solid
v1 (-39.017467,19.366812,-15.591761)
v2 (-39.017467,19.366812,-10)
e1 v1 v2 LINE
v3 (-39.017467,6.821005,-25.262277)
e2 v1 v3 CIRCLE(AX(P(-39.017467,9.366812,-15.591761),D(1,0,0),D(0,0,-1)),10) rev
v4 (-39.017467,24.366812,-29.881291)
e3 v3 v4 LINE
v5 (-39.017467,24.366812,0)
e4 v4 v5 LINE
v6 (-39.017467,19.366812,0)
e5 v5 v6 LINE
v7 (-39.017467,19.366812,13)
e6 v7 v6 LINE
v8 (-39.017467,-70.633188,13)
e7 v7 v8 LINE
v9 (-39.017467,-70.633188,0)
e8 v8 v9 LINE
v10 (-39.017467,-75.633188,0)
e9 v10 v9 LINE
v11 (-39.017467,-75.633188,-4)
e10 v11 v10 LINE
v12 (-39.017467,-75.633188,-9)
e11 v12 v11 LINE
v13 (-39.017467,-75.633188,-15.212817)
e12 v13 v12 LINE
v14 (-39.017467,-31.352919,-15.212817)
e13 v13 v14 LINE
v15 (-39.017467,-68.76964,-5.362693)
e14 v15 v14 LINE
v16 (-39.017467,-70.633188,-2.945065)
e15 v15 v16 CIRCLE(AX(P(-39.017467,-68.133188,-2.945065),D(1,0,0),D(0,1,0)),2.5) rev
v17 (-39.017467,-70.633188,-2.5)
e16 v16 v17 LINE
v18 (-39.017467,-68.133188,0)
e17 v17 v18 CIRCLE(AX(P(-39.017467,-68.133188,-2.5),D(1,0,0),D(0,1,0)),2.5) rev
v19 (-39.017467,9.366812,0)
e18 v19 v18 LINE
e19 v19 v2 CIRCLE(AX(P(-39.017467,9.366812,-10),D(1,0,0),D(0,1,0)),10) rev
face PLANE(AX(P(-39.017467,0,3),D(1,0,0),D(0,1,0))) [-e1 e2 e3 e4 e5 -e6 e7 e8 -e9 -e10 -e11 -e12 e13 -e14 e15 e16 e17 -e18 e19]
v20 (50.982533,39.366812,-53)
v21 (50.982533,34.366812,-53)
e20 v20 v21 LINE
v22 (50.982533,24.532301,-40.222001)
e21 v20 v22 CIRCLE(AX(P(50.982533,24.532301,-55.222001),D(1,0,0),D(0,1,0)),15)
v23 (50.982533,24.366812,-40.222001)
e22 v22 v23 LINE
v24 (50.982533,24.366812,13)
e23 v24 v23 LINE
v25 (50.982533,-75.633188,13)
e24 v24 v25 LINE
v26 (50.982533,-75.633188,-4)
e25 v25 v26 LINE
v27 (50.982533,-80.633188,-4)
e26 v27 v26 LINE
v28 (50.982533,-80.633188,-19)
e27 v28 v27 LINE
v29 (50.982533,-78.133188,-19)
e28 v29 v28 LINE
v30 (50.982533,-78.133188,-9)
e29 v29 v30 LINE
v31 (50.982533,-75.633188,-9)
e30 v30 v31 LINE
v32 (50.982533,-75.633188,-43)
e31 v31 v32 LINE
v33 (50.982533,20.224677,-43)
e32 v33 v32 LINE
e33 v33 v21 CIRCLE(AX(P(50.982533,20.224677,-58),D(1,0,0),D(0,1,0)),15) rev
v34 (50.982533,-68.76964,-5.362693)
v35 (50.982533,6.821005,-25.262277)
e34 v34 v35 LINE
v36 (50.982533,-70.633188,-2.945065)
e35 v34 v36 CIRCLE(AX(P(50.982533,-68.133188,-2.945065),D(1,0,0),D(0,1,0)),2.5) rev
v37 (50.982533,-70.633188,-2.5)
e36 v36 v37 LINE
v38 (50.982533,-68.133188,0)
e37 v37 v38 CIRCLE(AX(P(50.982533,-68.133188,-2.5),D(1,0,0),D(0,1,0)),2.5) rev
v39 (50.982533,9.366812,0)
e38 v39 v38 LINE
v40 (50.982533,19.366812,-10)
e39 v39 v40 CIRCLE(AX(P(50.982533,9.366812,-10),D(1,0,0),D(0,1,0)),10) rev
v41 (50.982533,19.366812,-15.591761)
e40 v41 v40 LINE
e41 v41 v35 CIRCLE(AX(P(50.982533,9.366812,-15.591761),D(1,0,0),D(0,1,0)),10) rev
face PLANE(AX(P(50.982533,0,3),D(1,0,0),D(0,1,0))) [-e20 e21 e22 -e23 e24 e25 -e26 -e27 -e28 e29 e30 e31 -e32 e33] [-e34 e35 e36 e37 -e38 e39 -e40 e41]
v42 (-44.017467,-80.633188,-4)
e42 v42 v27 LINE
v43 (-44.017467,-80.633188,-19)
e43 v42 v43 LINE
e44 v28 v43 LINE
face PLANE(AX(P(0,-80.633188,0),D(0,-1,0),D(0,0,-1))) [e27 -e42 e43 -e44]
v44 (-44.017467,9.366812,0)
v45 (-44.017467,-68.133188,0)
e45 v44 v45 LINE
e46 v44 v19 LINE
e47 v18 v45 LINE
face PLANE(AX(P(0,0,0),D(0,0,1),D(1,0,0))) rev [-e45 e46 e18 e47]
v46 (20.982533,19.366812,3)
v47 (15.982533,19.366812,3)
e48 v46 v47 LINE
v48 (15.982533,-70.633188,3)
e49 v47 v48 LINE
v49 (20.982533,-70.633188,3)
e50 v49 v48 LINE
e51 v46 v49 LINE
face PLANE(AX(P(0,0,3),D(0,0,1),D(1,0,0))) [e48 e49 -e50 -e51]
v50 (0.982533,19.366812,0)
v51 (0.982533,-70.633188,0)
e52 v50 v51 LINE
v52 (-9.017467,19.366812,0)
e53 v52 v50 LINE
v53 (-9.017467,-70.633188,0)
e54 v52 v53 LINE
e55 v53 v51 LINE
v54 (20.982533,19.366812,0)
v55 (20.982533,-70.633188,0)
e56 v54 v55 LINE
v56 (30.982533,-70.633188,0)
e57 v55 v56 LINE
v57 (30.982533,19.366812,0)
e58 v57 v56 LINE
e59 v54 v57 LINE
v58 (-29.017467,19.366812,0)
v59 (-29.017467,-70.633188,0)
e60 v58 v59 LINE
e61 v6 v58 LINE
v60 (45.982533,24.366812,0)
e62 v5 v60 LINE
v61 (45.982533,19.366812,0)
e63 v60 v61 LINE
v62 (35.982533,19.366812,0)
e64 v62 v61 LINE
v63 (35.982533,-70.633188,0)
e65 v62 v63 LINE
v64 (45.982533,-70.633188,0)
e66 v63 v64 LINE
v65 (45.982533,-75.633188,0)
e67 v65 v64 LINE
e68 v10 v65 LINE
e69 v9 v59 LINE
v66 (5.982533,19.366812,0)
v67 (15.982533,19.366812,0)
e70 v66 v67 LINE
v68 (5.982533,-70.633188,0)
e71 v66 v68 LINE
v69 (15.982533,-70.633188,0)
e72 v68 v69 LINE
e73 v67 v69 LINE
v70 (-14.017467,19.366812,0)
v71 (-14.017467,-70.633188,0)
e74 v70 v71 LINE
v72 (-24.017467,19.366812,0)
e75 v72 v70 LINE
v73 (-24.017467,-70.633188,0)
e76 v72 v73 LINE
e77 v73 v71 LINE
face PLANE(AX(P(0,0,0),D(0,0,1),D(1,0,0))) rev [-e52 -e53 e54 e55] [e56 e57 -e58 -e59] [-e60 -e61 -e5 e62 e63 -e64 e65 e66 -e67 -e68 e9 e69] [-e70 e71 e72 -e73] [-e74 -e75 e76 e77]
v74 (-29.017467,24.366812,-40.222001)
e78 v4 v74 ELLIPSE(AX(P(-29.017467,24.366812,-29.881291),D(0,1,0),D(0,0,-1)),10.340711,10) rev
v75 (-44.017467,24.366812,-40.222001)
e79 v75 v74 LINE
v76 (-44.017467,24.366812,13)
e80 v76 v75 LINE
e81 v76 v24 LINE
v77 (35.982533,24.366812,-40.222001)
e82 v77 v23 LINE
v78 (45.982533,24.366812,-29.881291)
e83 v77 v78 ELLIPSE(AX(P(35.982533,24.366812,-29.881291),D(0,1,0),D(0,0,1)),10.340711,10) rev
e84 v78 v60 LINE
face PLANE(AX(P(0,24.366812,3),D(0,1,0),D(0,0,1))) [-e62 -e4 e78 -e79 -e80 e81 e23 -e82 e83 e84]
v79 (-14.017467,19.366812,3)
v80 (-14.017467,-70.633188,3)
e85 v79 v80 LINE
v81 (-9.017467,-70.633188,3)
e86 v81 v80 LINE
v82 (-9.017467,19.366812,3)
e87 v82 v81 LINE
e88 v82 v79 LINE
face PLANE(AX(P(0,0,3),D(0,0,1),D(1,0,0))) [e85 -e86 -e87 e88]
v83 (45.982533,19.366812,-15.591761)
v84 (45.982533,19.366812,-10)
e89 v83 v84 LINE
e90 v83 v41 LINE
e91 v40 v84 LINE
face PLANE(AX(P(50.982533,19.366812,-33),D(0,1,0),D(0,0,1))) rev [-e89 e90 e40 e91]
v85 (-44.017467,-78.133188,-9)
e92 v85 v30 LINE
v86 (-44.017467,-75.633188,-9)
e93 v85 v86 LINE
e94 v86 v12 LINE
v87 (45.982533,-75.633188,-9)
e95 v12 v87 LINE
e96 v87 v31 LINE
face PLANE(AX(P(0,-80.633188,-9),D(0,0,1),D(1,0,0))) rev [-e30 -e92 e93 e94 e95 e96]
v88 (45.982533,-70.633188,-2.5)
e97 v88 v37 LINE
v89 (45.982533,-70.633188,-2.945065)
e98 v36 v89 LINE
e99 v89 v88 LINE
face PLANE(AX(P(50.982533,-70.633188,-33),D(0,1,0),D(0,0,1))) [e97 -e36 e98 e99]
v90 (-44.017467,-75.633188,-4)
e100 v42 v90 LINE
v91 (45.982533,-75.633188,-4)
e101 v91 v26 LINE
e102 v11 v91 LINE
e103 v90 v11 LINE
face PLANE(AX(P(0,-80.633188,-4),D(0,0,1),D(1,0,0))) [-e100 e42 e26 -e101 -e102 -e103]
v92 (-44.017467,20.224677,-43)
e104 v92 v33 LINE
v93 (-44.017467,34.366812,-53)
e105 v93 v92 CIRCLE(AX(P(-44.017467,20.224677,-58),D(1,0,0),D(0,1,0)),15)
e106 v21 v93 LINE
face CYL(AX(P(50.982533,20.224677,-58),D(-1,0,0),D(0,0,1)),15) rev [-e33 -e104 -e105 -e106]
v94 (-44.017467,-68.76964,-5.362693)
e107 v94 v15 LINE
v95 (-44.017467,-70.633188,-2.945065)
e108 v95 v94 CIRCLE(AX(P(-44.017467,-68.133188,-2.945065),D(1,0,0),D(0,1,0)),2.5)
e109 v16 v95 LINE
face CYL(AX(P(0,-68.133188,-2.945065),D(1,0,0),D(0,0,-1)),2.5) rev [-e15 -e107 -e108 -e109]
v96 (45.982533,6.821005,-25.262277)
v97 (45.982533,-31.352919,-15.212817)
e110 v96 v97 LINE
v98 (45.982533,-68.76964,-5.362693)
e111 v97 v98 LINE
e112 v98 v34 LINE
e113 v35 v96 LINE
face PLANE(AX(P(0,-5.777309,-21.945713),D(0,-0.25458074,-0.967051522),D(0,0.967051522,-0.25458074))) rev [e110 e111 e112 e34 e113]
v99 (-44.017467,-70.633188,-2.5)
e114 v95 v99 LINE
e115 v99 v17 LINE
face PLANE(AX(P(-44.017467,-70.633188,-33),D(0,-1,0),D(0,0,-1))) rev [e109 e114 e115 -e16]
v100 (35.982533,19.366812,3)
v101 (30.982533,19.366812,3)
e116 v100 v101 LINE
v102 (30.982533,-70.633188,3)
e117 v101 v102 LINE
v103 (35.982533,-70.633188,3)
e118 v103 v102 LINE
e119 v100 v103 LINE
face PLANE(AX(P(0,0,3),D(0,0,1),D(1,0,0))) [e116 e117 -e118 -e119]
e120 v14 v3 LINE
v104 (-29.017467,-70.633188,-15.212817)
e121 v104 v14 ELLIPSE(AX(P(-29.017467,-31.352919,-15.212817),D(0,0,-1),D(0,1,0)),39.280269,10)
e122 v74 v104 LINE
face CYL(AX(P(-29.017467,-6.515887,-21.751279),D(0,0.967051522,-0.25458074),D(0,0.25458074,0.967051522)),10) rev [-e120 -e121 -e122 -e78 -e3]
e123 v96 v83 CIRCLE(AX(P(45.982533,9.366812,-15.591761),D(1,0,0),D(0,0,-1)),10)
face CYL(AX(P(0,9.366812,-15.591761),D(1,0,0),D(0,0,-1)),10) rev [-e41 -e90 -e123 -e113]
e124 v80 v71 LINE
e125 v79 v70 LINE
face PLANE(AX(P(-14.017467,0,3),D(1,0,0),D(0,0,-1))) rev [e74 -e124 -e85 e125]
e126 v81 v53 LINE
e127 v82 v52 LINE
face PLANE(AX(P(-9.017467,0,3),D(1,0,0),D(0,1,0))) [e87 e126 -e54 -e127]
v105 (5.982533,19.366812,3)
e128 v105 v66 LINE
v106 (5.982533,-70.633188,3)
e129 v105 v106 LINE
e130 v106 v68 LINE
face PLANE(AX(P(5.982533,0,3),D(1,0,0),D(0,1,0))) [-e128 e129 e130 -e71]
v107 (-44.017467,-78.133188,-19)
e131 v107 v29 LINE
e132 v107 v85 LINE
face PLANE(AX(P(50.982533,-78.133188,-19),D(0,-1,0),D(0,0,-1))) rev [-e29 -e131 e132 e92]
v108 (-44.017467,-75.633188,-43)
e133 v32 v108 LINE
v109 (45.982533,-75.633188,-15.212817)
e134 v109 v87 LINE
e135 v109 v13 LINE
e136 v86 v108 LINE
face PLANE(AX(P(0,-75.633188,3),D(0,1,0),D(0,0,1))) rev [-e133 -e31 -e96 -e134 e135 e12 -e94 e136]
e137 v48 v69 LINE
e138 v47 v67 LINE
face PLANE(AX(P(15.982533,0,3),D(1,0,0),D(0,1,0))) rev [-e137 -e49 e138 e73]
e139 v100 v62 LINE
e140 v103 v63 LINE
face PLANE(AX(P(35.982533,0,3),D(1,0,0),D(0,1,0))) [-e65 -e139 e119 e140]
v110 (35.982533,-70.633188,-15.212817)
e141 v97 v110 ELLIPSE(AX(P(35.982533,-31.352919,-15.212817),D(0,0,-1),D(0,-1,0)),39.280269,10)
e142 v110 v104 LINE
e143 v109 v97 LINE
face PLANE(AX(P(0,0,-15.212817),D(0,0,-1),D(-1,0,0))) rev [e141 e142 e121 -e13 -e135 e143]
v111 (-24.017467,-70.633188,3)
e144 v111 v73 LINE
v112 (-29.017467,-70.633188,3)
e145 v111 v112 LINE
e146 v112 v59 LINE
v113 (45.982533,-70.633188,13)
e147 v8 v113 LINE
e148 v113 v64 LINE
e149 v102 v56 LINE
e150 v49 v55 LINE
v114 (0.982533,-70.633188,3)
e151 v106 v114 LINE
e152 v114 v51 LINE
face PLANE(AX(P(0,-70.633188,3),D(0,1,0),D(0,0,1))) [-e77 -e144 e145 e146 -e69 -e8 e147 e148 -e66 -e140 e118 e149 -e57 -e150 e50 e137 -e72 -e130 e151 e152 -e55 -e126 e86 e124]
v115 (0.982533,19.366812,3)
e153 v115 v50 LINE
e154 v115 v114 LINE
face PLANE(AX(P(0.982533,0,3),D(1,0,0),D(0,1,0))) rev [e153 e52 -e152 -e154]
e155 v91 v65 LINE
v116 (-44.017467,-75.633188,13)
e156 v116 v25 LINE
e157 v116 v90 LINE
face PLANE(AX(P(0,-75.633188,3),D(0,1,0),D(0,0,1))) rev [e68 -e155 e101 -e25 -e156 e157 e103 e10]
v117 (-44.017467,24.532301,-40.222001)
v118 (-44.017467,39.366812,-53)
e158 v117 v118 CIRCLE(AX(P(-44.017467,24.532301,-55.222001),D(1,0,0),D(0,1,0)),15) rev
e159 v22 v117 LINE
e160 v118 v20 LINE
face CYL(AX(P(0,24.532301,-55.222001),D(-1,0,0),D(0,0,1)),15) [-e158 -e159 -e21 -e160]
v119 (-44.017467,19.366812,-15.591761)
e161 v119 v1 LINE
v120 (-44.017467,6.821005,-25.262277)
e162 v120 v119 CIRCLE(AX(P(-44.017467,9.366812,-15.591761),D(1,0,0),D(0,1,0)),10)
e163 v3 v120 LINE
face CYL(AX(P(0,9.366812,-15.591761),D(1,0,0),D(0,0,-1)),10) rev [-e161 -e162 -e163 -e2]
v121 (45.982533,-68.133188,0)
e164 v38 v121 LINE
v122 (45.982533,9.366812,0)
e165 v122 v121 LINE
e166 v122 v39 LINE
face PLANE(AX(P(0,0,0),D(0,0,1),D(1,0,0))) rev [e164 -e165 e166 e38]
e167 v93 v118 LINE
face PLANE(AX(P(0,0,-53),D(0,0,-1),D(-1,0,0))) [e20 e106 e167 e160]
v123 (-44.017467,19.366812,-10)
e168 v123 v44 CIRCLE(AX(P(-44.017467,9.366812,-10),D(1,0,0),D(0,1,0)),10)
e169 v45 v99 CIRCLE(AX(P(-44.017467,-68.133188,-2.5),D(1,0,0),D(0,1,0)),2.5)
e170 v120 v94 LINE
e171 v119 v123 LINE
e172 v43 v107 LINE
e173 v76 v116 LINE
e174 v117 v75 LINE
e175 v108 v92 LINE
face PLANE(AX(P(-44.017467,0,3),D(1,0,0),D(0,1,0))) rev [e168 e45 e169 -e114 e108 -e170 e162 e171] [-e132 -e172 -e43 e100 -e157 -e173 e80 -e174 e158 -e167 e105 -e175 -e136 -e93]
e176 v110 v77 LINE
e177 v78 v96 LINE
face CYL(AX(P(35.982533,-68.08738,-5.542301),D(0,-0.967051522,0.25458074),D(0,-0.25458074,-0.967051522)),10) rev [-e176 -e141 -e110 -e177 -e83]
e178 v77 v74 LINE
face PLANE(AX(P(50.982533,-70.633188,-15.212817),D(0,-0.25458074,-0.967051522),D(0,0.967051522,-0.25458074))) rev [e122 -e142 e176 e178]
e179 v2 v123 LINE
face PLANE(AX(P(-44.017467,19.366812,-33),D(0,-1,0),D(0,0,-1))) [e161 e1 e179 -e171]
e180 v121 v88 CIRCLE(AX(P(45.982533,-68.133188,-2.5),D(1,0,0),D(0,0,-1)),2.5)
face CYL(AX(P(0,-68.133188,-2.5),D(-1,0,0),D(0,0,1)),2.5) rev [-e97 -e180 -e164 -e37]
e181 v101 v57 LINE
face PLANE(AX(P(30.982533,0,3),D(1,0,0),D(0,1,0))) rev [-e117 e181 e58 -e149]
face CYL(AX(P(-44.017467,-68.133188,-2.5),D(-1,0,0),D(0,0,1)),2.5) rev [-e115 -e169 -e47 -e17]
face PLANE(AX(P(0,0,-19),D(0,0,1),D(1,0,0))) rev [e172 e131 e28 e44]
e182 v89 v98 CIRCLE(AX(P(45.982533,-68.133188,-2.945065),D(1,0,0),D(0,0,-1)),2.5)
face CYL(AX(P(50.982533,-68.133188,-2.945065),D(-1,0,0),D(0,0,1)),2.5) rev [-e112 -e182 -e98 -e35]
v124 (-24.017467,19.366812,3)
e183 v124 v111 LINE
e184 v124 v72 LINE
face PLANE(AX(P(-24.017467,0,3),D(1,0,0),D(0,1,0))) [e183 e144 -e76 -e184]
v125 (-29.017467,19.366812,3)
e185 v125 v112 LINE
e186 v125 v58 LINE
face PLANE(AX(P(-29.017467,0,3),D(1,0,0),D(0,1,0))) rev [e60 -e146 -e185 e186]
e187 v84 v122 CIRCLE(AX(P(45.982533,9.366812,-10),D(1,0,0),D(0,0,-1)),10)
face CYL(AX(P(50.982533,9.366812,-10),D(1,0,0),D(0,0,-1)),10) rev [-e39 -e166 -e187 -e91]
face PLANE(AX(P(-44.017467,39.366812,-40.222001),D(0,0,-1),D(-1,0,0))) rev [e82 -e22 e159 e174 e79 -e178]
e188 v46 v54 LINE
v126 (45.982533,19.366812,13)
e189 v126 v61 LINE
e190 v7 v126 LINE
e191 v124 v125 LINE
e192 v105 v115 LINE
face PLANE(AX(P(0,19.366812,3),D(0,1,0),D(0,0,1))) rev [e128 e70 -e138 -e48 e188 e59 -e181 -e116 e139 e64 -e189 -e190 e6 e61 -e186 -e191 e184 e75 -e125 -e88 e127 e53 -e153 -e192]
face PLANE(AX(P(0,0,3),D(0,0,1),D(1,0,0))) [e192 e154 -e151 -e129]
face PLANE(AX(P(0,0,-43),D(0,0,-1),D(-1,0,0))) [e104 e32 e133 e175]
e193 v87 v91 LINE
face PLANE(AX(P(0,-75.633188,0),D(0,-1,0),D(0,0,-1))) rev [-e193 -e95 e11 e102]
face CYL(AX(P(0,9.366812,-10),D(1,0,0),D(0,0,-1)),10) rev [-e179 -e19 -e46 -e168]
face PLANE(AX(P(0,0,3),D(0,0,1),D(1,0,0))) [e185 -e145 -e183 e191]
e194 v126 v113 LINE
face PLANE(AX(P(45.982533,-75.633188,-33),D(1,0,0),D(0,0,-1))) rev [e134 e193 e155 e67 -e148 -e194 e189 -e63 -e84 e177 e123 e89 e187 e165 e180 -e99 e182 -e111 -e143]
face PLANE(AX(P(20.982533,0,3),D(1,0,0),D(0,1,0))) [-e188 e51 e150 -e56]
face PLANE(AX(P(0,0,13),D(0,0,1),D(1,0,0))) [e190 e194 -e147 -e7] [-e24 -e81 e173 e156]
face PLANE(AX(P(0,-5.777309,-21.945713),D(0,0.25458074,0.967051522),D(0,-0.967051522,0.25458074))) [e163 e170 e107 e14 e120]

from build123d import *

# Parameters (mm, degrees)
SKETCH1_W                = 5
SKETCH1_H                = 90
SKETCH1_H_2              = 5
SKETCH1_W_2              = 10
BOSS_EXTRUDE1_DEPTH      = 3
SKETCH1_3_W              = 5
SKETCH1_3_H              = 5
SKETCH1_3_H_2            = 90
SKETCH1_3_W_2            = 10
BOSS_EXTRUDE2_DEPTH      = 13
SKETCH2_W                = 5
SKETCH2_H                = 5
BOSS_EXTRUDE3_DEPTH      = 33
BOSS_EXTRUDE4_DEPTH      = 10
BOSS_EXTRUDE4_DEPTH_BACK = 17.787183465
SKETCH3_W                = 95
SKETCH3_H                = 100
SKETCH7_W                = 85
SKETCH7_H                = 5
SKETCH7_W_2              = 5
BOSS_EXTRUDE6_DEPTH      = 5
SKETCH8_W                = 95
SKETCH8_H                = 2.5
BOSS_EXTRUDE7_DEPTH      = 10
CUT_EXTRUDE1_DEPTH       = 132.816960102
BOSS_EXTRUDE9_REACH      = 101.483
SKETCH9_W                = 5
SKETCH9_H                = 5
SKETCH11_W               = 5
SKETCH11_H               = 93.06639607
BOSS_EXTRUDE12_DEPTH     = 10
SKETCH13_W               = 5
SKETCH13_H               = 10
BOSS_EXTRUDE13_DEPTH     = 4
FILLET2_R                = 10
FILLET3_START            = -44.017467249
FILLET3_DEPTH            = 5
FILLET3_START_2          = 45.982532751
FILLET3_2_DEPTH          = 5
FILLET4_R                = 10
SKETCH14_W               = 95
SKETCH14_H               = 2.777998613
BOSS_EXTRUDE14_DEPTH     = 15
SKETCH15_W               = 95
SKETCH15_H               = 5
BOSS_EXTRUDE15_DEPTH     = 10
FILLET5_R                = 15


with BuildPart() as part:
    # Sketch1 → Boss-Extrude1 (new body)
    with BuildSketch(Plane.XY):
        with Locations((48.482532751, -25.633187773)):
            Rectangle(SKETCH1_W, SKETCH1_H)
        with Locations((48.482532751, 21.866812227)):
            Rectangle(SKETCH1_W, SKETCH1_H_2)
        with Locations((40.982532751, 21.866812227)):
            Rectangle(SKETCH1_W_2, SKETCH1_H_2)
        with Locations((33.482532751, 21.866812227)):
            Rectangle(SKETCH1_W, SKETCH1_H_2)
        with Locations((33.482532751, -25.633187773)):
            Rectangle(SKETCH1_W, SKETCH1_H)
        with Locations((18.482532751, -25.633187773)):
            Rectangle(SKETCH1_W, SKETCH1_H)
        with Locations((18.482532751, 21.866812227)):
            Rectangle(SKETCH1_W, SKETCH1_H_2)
        with Locations((25.982532751, 21.866812227)):
            Rectangle(SKETCH1_W_2, SKETCH1_H_2)
        with Locations((10.982532751, 21.866812227)):
            Rectangle(SKETCH1_W_2, SKETCH1_H_2)
        with Locations((3.482532751, 21.866812227)):
            Rectangle(SKETCH1_W, SKETCH1_H_2)
        with Locations((3.482532751, -25.633187773)):
            Rectangle(SKETCH1_W, SKETCH1_H)
        with Locations((-4.017467249, 21.866812227)):
            Rectangle(SKETCH1_W_2, SKETCH1_H_2)
        with Locations((-11.517467249, 21.866812227)):
            Rectangle(SKETCH1_W, SKETCH1_H_2)
        with Locations((-11.517467249, -25.633187773)):
            Rectangle(SKETCH1_W, SKETCH1_H)
        with Locations((-19.017467249, 21.866812227)):
            Rectangle(SKETCH1_W_2, SKETCH1_H_2)
        with Locations((-26.517467249, 21.866812227)):
            Rectangle(SKETCH1_W, SKETCH1_H_2)
        with Locations((-26.517467249, -25.633187773)):
            Rectangle(SKETCH1_W, SKETCH1_H)
        with Locations((-34.017467249, 21.866812227)):
            Rectangle(SKETCH1_W_2, SKETCH1_H_2)
        with Locations((-41.517467249, 21.866812227)):
            Rectangle(SKETCH1_W, SKETCH1_H_2)
        with Locations((-41.517467249, -25.633187773)):
            Rectangle(SKETCH1_W, SKETCH1_H)
        with Locations((48.482532751, -73.133187773)):
            Rectangle(SKETCH1_W, SKETCH1_H_2)
        with Locations((40.982532751, -73.133187773)):
            Rectangle(SKETCH1_W_2, SKETCH1_H_2)
        with Locations((33.482532751, -73.133187773)):
            Rectangle(SKETCH1_W, SKETCH1_H_2)
        with Locations((25.982532751, -73.133187773)):
            Rectangle(SKETCH1_W_2, SKETCH1_H_2)
        with Locations((18.482532751, -73.133187773)):
            Rectangle(SKETCH1_W, SKETCH1_H_2)
        with Locations((10.982532751, -73.133187773)):
            Rectangle(SKETCH1_W_2, SKETCH1_H_2)
        with Locations((3.482532751, -73.133187773)):
            Rectangle(SKETCH1_W, SKETCH1_H_2)
        with Locations((-4.017467249, -73.133187773)):
            Rectangle(SKETCH1_W_2, SKETCH1_H_2)
        with Locations((-11.517467249, -73.133187773)):
            Rectangle(SKETCH1_W, SKETCH1_H_2)
        with Locations((-19.017467249, -73.133187773)):
            Rectangle(SKETCH1_W_2, SKETCH1_H_2)
        with Locations((-26.517467249, -73.133187773)):
            Rectangle(SKETCH1_W, SKETCH1_H_2)
        with Locations((-34.017467249, -73.133187773)):
            Rectangle(SKETCH1_W_2, SKETCH1_H_2)
        with Locations((-41.517467249, -73.133187773)):
            Rectangle(SKETCH1_W, SKETCH1_H_2)
    extrude(amount=BOSS_EXTRUDE1_DEPTH)

    # Sketch1<3> → Boss-Extrude2 (add)
    with BuildSketch(Plane.XY):
        with Locations((48.482532751, 21.866812227)):
            Rectangle(SKETCH1_3_W, SKETCH1_3_H)
        with Locations((48.482532751, -25.633187773)):
            Rectangle(SKETCH1_3_W, SKETCH1_3_H_2)
        with Locations((48.482532751, -73.133187773)):
            Rectangle(SKETCH1_3_W, SKETCH1_3_H)
        with Locations((40.982532751, 21.866812227)):
            Rectangle(SKETCH1_3_W_2, SKETCH1_3_H)
        with Locations((33.482532751, 21.866812227)):
            Rectangle(SKETCH1_3_W, SKETCH1_3_H)
        with Locations((25.982532751, 21.866812227)):
            Rectangle(SKETCH1_3_W_2, SKETCH1_3_H)
        with Locations((18.482532751, 21.866812227)):
            Rectangle(SKETCH1_3_W, SKETCH1_3_H)
        with Locations((10.982532751, 21.866812227)):
            Rectangle(SKETCH1_3_W_2, SKETCH1_3_H)
        with Locations((3.482532751, 21.866812227)):
            Rectangle(SKETCH1_3_W, SKETCH1_3_H)
        with Locations((-4.017467249, 21.866812227)):
            Rectangle(SKETCH1_3_W_2, SKETCH1_3_H)
        with Locations((-11.517467249, 21.866812227)):
            Rectangle(SKETCH1_3_W, SKETCH1_3_H)
        with Locations((-19.017467249, 21.866812227)):
            Rectangle(SKETCH1_3_W_2, SKETCH1_3_H)
        with Locations((-26.517467249, 21.866812227)):
            Rectangle(SKETCH1_3_W, SKETCH1_3_H)
        with Locations((-34.017467249, 21.866812227)):
            Rectangle(SKETCH1_3_W_2, SKETCH1_3_H)
        with Locations((-41.517467249, 21.866812227)):
            Rectangle(SKETCH1_3_W, SKETCH1_3_H)
        with Locations((-41.517467249, -25.633187773)):
            Rectangle(SKETCH1_3_W, SKETCH1_3_H_2)
        with Locations((-41.517467249, -73.133187773)):
            Rectangle(SKETCH1_3_W, SKETCH1_3_H)
        with Locations((40.982532751, -73.133187773)):
            Rectangle(SKETCH1_3_W_2, SKETCH1_3_H)
        with Locations((33.482532751, -73.133187773)):
            Rectangle(SKETCH1_3_W, SKETCH1_3_H)
        with Locations((25.982532751, -73.133187773)):
            Rectangle(SKETCH1_3_W_2, SKETCH1_3_H)
        with Locations((18.482532751, -73.133187773)):
            Rectangle(SKETCH1_3_W, SKETCH1_3_H)
        with Locations((10.982532751, -73.133187773)):
            Rectangle(SKETCH1_3_W_2, SKETCH1_3_H)
        with Locations((3.482532751, -73.133187773)):
            Rectangle(SKETCH1_3_W, SKETCH1_3_H)
        with Locations((-4.017467249, -73.133187773)):
            Rectangle(SKETCH1_3_W_2, SKETCH1_3_H)
        with Locations((-11.517467249, -73.133187773)):
            Rectangle(SKETCH1_3_W, SKETCH1_3_H)
        with Locations((-19.017467249, -73.133187773)):
            Rectangle(SKETCH1_3_W_2, SKETCH1_3_H)
        with Locations((-26.517467249, -73.133187773)):
            Rectangle(SKETCH1_3_W, SKETCH1_3_H)
        with Locations((-34.017467249, -73.133187773)):
            Rectangle(SKETCH1_3_W_2, SKETCH1_3_H)
    extrude(amount=BOSS_EXTRUDE2_DEPTH)

    # Sketch2 → Boss-Extrude3 (add)
    with BuildSketch(Plane(origin=(0, 0, 0), x_dir=(-1, 0, 0), z_dir=(0, 0, -1))):
        with Locations((-48.482532751, 21.866812227)):
            Rectangle(SKETCH2_W, SKETCH2_H)
        with Locations((41.517467249, 21.866812227)):
            Rectangle(SKETCH2_W, SKETCH2_H)
        with Locations((41.517467249, -73.133187773)):
            Rectangle(SKETCH2_W, SKETCH2_H)
        with Locations((-48.482532751, -73.133187773)):
            Rectangle(SKETCH2_W, SKETCH2_H)
    extrude(amount=BOSS_EXTRUDE3_DEPTH)

    # Sketch3 → Boss-Extrude4 (add, two sides: drawn at the far end of the back side and taken through both)
    with BuildSketch(Plane(origin=(0, 0, -33), x_dir=(-1, 0, 0), z_dir=(0, 0, -1)).offset(-BOSS_EXTRUDE4_DEPTH_BACK)):
        with Locations((-3.482532751, -25.633187773)):
            Rectangle(SKETCH3_W, SKETCH3_H)
    extrude(amount=BOSS_EXTRUDE4_DEPTH + BOSS_EXTRUDE4_DEPTH_BACK)

    # Sketch7 → Boss-Extrude6 (add)
    with BuildSketch(Plane.XZ.offset(75.633187773)):
        with Locations((3.482532751, -6.5)):
            Rectangle(SKETCH7_W, SKETCH7_H)
        with Locations((48.482532751, -6.5)):
            Rectangle(SKETCH7_W_2, SKETCH7_H)
        with Locations((-41.517467249, -6.5)):
            Rectangle(SKETCH7_W_2, SKETCH7_H)
    extrude(amount=BOSS_EXTRUDE6_DEPTH)

    # Sketch8 → Boss-Extrude7 (add)
    with BuildSketch(Plane(origin=(0, 0, -9), x_dir=(-1, 0, 0), z_dir=(0, 0, -1))):
        with Locations((-3.482532751, -79.383187773)):
            Rectangle(SKETCH8_W, SKETCH8_H)
    extrude(amount=BOSS_EXTRUDE7_DEPTH)

    # Sketch5 → Cut-Extrude1 (cut, through all)
    with BuildSketch(Plane.ZY.offset(44.017467249)):
        Polygon((-15.212816535, -70.633187773), (-40.222001387, 24.366812227), (-15.212816535, 24.366812227), align=None)
    extrude(amount=-CUT_EXTRUDE1_DEPTH, mode=Mode.SUBTRACT)

    # Sketch9 → Boss-Extrude9 (add, up to next)
    with BuildSketch(Plane(origin=(0, 0, -15.212816535), x_dir=(-1, 0, 0), z_dir=(0, 0, -1)), mode=Mode.PRIVATE) as boss_extrude9_sk1:
        with Locations((41.517467249, 21.866812227)):
            Rectangle(SKETCH9_W, SKETCH9_H)
    boss_extrude9_tool1 = extrude(boss_extrude9_sk1.sketch, amount=BOSS_EXTRUDE9_REACH, mode=Mode.PRIVATE) - part.part
    # Sketch9 → Boss-Extrude9 (add, up to next)
    with BuildSketch(Plane(origin=(0, 0, -15.212816535), x_dir=(-1, 0, 0), z_dir=(0, 0, -1)), mode=Mode.PRIVATE) as boss_extrude9_sk2:
        with Locations((-48.482532751, 21.866812227)):
            Rectangle(SKETCH9_W, SKETCH9_H)
    boss_extrude9_tool2 = extrude(boss_extrude9_sk2.sketch, amount=BOSS_EXTRUDE9_REACH, mode=Mode.PRIVATE) - part.part
    add(boss_extrude9_tool1.solids().sort_by_distance((-41.517467, 21.866812, -15.212817))[0])
    add(boss_extrude9_tool2.solids().sort_by_distance((48.482533, 21.866812, -15.212817))[0])

    # Sketch11 → Boss-Extrude12 (add)
    with BuildSketch(Plane(origin=(0, -8.323116729, -31.616227955), x_dir=(1, 0, 0), z_dir=(0, 0.2545807398296556, 0.9670515223646491))):
        with Locations((-41.517467249, -17.899843642)):
            Rectangle(SKETCH11_W, SKETCH11_H)
        with Locations((48.482532751, -17.899843642)):
            Rectangle(SKETCH11_W, SKETCH11_H)
    extrude(amount=BOSS_EXTRUDE12_DEPTH)

    # Sketch13 → Boss-Extrude13 (add)
    with BuildSketch(Plane(origin=(0, -62.310071044, 16.40341142), x_dir=(1, 0, 0), z_dir=(0, -0.9670515223646491, 0.2545807398296557))):
        with Locations((48.482532751, -27.69342659)):
            Rectangle(SKETCH13_W, SKETCH13_H)
        with Locations((-41.517467249, -27.69342659)):
            Rectangle(SKETCH13_W, SKETCH13_H)
    extrude(amount=BOSS_EXTRUDE13_DEPTH)

    # Fillet2
    # the kernel refuses this fillet: 10 mm, written as the material it adds along each edge
    with BuildSketch(Plane(origin=(45.982532751, 19.366812227, 0), x_dir=(0, 0, -1), z_dir=(1, 0, 0)), Plane(origin=(-39.017467249, 19.366812227, 0), x_dir=(0, -1, 0), z_dir=(-1, 0, 0))) as fillet2_piece_1:
        with BuildLine():
            CenterArc((FILLET2_R, -FILLET2_R), FILLET2_R, 90, 90)
            Line((0, -FILLET2_R), (0, 0))
            Line((0, 0), (FILLET2_R, 0))
        make_face()
    extrude(amount=5)
    with BuildSketch(Plane(origin=(-39.017467249, 19.366812227, -28.565017825), x_dir=(0, -0.9670515223646489, 0.25458073982965584), z_dir=(-1, 0, 0))) as fillet2_piece_2:
        with BuildLine():
            CenterArc((FILLET2_R * 1.29732564482, FILLET2_R), FILLET2_R, 165.251256556, 104.748743444)
            Line((FILLET2_R * 0.330274122459, FILLET2_R * 1.25458073983), (0, 0))
            Line((0, 0), (FILLET2_R * 1.29732564482, 0))
        make_face()
    extrude(amount=5)
    with BuildSketch(Plane(origin=(50.982532751, 19.366812227, -28.565017825), x_dir=(0, 0, 1), z_dir=(-1, 0, 0))) as fillet2_piece_3:
        with BuildLine():
            CenterArc((FILLET2_R * 1.29732564482, -FILLET2_R), FILLET2_R, 90, 104.748743444)
            Line((FILLET2_R * 0.330274122459, -FILLET2_R * 1.25458073983), (0, 0))
            Line((0, 0), (FILLET2_R * 1.29732564482, 0))
        make_face()
    extrude(amount=5)

    # Fillet3: read off the stored shape, not the designer's step
    # Fillet3 outline → Fillet3 (add)
    with BuildSketch(Plane.YZ.offset(FILLET3_START)):
        with BuildLine():
            Line((-70.633187773, -4.872105861), (-68.769639622, -5.362693442))
            ThreePointArc((-68.769639622, -5.362693442), (-70.113229391, -4.471313367), (-70.633187773, -2.945064636))
            Line((-70.633187773, -2.945064636), (-70.633187773, -4.872105861))
        make_face()
        with BuildLine():
            Line((-70.633187773, 0), (-70.633187773, -2.5))
            ThreePointArc((-70.633187773, -2.5), (-69.900954726, -0.732233047), (-68.133187773, 0))
            Line((-68.133187773, 0), (-70.633187773, 0))
        make_face()
    extrude(amount=FILLET3_DEPTH)

    # Fillet3 2 outline → Fillet3 2 (add)
    with BuildSketch(Plane.YZ.offset(FILLET3_START_2)):
        with BuildLine():
            Line((-70.633187773, -4.872105861), (-68.769639622, -5.362693442))
            ThreePointArc((-68.769639622, -5.362693442), (-70.113229391, -4.471313367), (-70.633187773, -2.945064636))
            Line((-70.633187773, -2.945064636), (-70.633187773, -4.872105861))
        make_face()
        with BuildLine():
            Line((-70.633187773, 0), (-70.633187773, -2.5))
            ThreePointArc((-70.633187773, -2.5), (-69.900954726, -0.732233047), (-68.133187773, 0))
            Line((-68.133187773, 0), (-70.633187773, 0))
        make_face()
    extrude(amount=FILLET3_2_DEPTH)

    # Fillet4
    fillet4_edges = [part.edges().sort_by_distance(p)[0] for p in [
        (-39.017467249, -23.133187773, -27.717408961),
        (45.982532751, -23.133187773, -27.717408961),
    ]]
    fillet(fillet4_edges, radius=FILLET4_R - 0.0001)  # a hair under: the kernel refuses the full size

    # Sketch14 → Boss-Extrude14 (add)
    with BuildSketch(Plane(origin=(0, 24.366812227, 0), x_dir=(1, 0, 0), z_dir=(0, 1, 0))):
        with Locations((3.482532751, 41.611000694)):
            Rectangle(SKETCH14_W, SKETCH14_H)
    extrude(amount=BOSS_EXTRUDE14_DEPTH)

    # Sketch15 → Boss-Extrude15 (add)
    with BuildSketch(Plane(origin=(0, 0, -43), x_dir=(-1, 0, 0), z_dir=(0, 0, -1))):
        with Locations((-3.482532751, 36.866812227)):
            Rectangle(SKETCH15_W, SKETCH15_H)
    extrude(amount=BOSS_EXTRUDE15_DEPTH)

    # Fillet5
    # the kernel refuses this fillet: 15 mm, written as the material it adds along each edge
    with BuildSketch(Plane(origin=(-44.017467249, 34.366812227, -43), x_dir=(0, 0, -1), z_dir=(1, 0, 0))) as fillet5_piece_1:
        with BuildLine():
            CenterArc((15, -14.142135624), FILLET5_R, 109.471220634, 70.528779366)
            Line((0, -14.142135624), (-0.3, -14.142135624))
            Line((-0.3, -14.142135624), (-0.3, 0))
            Line((-0.3, 0), (0, 0.3))
            ThreePointArc((0, 0.3), (5, 0.3), (9.9, 0.282842712))
            Line((9.9, 0.282842712), (10, 0))
        make_face()
    extrude(amount=95)
    # the kernel refuses this fillet: 15 mm, written as the material it takes off along each edge
    with BuildSketch(Plane(origin=(88.06880968, 39.366812227, -40.222001387), x_dir=(0, -1, 0), z_dir=(-1, 0, 0))) as fillet5_2_piece_1:
        with BuildLine():
            CenterArc((14.834510772, -15), FILLET5_R, 90, 81.481228686)
            Line((0, -12.777998613), (-0.296690215, -12.733558585))
            ThreePointArc((-0.296690215, -12.733558585), (-0.3, -6.388999307), (-0.3, 0))
            Line((-0.3, 0), (0, 0.3))
            Line((0, 0.3), (14.834510772, 0.3))
            Line((14.834510772, 0.3), (14.834510772, 0))
        make_face()
    extrude(amount=169.172553859, mode=Mode.SUBTRACT)


solid = part.part
